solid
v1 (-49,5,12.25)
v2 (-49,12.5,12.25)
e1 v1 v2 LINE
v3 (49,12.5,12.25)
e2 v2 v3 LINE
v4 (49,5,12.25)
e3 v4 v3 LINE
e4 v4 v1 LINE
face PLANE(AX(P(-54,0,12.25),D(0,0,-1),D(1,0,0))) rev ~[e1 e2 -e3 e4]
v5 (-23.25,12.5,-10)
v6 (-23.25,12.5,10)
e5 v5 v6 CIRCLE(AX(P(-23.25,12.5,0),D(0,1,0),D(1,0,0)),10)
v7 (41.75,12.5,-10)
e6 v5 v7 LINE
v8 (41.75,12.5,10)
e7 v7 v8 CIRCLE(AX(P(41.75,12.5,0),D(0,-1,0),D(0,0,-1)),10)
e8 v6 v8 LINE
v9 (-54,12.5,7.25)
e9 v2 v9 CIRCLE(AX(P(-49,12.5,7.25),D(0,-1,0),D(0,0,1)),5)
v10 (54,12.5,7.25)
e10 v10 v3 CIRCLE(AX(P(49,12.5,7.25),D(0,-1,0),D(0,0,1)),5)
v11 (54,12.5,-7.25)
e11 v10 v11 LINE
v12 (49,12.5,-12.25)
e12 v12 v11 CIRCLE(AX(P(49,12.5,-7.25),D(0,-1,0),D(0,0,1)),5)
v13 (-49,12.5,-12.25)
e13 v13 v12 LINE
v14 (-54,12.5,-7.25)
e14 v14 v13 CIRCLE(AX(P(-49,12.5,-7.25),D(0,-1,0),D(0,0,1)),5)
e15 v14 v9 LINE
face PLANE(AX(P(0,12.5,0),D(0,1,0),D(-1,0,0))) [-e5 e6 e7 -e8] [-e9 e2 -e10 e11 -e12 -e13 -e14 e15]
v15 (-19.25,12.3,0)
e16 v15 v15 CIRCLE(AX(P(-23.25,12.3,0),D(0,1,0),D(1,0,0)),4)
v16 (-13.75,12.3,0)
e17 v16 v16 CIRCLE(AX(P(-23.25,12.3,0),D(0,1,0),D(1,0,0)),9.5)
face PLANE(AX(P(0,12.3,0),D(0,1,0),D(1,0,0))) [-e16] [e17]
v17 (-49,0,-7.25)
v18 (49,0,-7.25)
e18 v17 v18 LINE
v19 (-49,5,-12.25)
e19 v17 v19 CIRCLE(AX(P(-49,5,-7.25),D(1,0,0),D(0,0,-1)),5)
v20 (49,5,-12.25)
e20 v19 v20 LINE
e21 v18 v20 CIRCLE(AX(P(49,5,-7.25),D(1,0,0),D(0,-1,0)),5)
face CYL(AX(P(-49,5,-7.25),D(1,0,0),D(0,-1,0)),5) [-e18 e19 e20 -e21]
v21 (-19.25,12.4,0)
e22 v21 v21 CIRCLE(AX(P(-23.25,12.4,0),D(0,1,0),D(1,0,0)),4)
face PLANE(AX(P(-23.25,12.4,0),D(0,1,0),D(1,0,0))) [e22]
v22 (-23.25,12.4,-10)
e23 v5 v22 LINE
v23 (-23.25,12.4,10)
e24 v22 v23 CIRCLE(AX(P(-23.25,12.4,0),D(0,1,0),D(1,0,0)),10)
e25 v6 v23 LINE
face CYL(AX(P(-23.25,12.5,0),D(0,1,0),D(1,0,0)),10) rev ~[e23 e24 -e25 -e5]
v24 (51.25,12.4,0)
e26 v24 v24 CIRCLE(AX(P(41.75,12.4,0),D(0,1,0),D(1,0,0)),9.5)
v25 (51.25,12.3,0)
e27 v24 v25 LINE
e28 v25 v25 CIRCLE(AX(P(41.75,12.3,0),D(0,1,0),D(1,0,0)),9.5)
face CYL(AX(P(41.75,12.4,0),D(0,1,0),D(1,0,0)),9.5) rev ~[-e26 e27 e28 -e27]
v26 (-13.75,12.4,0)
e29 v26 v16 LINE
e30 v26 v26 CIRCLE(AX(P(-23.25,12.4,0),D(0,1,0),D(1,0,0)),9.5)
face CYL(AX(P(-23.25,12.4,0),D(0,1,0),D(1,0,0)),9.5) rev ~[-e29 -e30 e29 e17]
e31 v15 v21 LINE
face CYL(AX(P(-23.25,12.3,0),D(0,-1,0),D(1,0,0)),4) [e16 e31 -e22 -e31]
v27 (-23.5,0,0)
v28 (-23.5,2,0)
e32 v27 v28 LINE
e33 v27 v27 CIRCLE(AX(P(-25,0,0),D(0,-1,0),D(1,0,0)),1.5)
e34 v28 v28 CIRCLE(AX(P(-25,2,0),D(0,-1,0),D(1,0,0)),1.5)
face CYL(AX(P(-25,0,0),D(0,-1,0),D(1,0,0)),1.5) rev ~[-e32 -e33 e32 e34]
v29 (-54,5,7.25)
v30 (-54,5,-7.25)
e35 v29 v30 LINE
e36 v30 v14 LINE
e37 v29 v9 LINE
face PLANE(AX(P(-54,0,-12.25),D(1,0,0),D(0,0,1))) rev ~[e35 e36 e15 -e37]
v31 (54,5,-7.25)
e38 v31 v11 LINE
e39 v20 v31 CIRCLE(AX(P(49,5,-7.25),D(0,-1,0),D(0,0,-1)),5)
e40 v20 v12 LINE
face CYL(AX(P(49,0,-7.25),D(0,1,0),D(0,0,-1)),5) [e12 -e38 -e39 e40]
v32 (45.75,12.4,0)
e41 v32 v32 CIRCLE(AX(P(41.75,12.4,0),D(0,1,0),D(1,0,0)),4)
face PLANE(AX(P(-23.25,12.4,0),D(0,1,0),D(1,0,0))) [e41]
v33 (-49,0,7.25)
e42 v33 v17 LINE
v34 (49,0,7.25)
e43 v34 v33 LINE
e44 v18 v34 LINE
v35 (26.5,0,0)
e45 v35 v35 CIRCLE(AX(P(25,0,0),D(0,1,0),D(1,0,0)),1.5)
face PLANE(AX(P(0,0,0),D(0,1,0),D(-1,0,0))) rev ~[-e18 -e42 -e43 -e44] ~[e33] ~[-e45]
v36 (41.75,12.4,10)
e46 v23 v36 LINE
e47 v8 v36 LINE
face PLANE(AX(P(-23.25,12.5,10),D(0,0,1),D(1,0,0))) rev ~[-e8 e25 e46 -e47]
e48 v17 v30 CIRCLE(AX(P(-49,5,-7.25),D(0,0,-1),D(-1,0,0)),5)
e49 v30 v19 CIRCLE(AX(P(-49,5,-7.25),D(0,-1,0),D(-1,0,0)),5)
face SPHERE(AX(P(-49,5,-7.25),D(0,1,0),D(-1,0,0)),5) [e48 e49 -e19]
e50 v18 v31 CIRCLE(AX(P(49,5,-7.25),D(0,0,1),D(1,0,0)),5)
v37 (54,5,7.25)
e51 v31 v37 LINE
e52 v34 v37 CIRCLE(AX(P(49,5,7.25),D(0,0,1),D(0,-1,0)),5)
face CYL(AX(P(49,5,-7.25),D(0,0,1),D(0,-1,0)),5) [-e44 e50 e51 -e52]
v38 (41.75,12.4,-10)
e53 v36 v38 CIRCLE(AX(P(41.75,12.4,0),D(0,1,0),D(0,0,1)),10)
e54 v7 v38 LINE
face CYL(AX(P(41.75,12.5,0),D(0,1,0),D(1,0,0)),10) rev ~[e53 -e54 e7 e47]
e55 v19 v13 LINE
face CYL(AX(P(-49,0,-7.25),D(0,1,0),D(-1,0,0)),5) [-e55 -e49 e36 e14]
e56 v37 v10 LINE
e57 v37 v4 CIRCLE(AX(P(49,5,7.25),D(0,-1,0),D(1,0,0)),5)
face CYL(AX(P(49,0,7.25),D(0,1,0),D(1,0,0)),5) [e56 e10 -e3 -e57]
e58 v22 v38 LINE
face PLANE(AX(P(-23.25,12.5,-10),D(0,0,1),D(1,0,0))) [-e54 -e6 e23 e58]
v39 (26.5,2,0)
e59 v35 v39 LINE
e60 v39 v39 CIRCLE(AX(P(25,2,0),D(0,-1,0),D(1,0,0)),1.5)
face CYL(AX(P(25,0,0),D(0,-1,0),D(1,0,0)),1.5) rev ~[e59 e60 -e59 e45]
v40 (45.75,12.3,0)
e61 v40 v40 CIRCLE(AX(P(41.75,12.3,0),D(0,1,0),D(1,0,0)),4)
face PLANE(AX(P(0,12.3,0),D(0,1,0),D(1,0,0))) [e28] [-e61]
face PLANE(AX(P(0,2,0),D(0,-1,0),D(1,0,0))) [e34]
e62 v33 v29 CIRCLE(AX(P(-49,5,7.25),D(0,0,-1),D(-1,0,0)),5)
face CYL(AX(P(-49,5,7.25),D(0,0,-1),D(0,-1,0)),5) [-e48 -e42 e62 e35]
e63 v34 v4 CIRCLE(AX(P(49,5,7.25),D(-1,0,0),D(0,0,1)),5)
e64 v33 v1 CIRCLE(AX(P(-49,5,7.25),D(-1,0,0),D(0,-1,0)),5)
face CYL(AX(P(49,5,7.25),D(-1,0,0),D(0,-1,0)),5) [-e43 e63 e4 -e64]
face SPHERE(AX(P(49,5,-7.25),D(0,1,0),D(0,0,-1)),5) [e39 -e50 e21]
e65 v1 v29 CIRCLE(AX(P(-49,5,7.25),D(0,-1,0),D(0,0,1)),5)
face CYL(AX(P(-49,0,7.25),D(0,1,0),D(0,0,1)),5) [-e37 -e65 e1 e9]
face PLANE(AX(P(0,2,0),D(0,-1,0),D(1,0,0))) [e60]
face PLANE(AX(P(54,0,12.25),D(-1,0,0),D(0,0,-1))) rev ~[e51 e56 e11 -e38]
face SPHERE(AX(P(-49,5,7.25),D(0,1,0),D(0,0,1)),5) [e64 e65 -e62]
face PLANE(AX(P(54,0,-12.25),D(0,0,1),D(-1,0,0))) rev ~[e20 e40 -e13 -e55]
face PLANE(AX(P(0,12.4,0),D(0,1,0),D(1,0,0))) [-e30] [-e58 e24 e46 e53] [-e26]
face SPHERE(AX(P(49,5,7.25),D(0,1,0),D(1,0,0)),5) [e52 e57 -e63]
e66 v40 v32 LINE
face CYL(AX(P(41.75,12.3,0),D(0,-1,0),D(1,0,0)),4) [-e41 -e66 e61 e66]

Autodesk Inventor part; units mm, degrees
ref_plane "YZ Plane" through (0, 0, 0) normal (1, 0, 0) x (0, 1, 0)
ref_plane "XZ Plane" through (0, 0, 0) normal (0, 1, 0) x (-1, 0, 0)
ref_plane "XY Plane" through (0, 0, 0) normal (0, 0, 1) x (1, 0, 0)
sketch "Sketch1" plane through (0, 0, 0) normal (0, 1, 0) x (-1, 0, 0)
  line L0 (0, 0) -> (0, -12.25)
  line L1 (0, -12.25) -> (54, -12.25)
  line L2 (54, -12.25) -> (54, 12.25)
  line L3 (54, 12.25) -> (-54, 12.25)
  line L4 (-54, 12.25) -> (-54, -12.25)
  line L5 (-54, -12.25) -> (0, -12.25)
  dimension "d0" = 12.25
  dimension "d1" = 54
  dimension "d2" = 24.5
  dimension "d3" = 108
  dimension "d4" = 24.5
extrude "Extrusion1" add sketch "Sketch1" along normal blind 12.5
fillet "Fillet1" radius 5 4 edges at (-54, 6.25, 12.25) (-54, 6.25, -12.25) (54, 6.25, 12.25) (54, 6.25, -12.25)
sketch "Sketch2" plane through (0, 12.5, 0) normal (0, 1, 0) x (1, 0, 0)
  line L0 (54, -7.25) -> (54, 7.25) projected
  line L1 (54, 0) -> (41.75, 0)
  circle A0 centre (41.75, 0) radius 10
  line L2 (41.75, 0) -> (-23.25, 0)
  circle A1 centre (-23.25, 0) radius 10
  line L3 (-23.25, 10) -> (41.75, 10)
  line L4 (-23.25, -10) -> (41.75, -10)
  point P0 (0, 0)
  dimension "d8" = 12.25
  dimension "d9" = 20
  dimension "d10" = 65
  dimension "d11" = 20
extrude "Extrusion2" cut sketch "Sketch2" against normal blind 0.1
sketch "Sketch3" plane through (0, 12.4, 0) normal (0, 1, 0) x (1, 0, 0)
  line L0 (-23.25, 10) -> (41.75, 10) projected
  arc A0 (-23.25, 10) -> (-23.25, -10) centre (-23.25, 0) ccw projected
  line L1 (41.75, -10) -> (-23.25, -10) projected
  arc A1 (41.75, -10) -> (41.75, 10) centre (41.75, 0) ccw projected
  circle A2 centre (-23.25, 0) radius 9.5
  circle A3 centre (41.75, 0) radius 9.5
  point P0 (0, 0)
  dimension "d14" = 19
  dimension "d15" = 19
extrude "Extrusion3" cut sketch "Sketch3" against normal blind 0.1 contours A2 | A3
sketch "Sketch4" plane through (-23.25, 12.3, 0) normal (0, 1, 0) x (1, 0, 0)
  circle A0 centre (0, 0) radius 9.5 projected
  circle A1 centre (65, 0) radius 9.5 projected
  circle A2 centre (0, 0) radius 4
  circle A3 centre (65, 0) radius 4
  point P0 (23.25, 0)
  dimension "d18" = 8
  dimension "d19" = 8
extrude "Extrusion4" add sketch "Sketch4" along normal blind 0.1 contours A2 | A3
fillet "Fillet2" radius 5 8 edges at (-52.5355, 0, -10.7855) (-54, 0, 0) (-52.5355, 0, 10.7855) (0, 0, 12.25) (52.5355, 0, 10.7855) (54, 0, 0) (52.5355, 0, -10.7855) (0, 0, -12.25)
sketch "Sketch5" plane through (0, 0, 0) normal (0, -1, 0) x (1, 0, 0)
  line L0 (0, 0) -> (-25, 0)
  line L1 (0, 0) -> (25, 0)
  circle A0 centre (25, 0) radius 1.5
  circle A1 centre (-25, 0) radius 1.5
  dimension "d23" = 25
  dimension "d24" = 25
  dimension "d25" = 3
  dimension "d26" = 3
extrude "Extrusion5" cut sketch "Sketch5" against normal blind 2
properties part number "IntelRealSenseT265"
